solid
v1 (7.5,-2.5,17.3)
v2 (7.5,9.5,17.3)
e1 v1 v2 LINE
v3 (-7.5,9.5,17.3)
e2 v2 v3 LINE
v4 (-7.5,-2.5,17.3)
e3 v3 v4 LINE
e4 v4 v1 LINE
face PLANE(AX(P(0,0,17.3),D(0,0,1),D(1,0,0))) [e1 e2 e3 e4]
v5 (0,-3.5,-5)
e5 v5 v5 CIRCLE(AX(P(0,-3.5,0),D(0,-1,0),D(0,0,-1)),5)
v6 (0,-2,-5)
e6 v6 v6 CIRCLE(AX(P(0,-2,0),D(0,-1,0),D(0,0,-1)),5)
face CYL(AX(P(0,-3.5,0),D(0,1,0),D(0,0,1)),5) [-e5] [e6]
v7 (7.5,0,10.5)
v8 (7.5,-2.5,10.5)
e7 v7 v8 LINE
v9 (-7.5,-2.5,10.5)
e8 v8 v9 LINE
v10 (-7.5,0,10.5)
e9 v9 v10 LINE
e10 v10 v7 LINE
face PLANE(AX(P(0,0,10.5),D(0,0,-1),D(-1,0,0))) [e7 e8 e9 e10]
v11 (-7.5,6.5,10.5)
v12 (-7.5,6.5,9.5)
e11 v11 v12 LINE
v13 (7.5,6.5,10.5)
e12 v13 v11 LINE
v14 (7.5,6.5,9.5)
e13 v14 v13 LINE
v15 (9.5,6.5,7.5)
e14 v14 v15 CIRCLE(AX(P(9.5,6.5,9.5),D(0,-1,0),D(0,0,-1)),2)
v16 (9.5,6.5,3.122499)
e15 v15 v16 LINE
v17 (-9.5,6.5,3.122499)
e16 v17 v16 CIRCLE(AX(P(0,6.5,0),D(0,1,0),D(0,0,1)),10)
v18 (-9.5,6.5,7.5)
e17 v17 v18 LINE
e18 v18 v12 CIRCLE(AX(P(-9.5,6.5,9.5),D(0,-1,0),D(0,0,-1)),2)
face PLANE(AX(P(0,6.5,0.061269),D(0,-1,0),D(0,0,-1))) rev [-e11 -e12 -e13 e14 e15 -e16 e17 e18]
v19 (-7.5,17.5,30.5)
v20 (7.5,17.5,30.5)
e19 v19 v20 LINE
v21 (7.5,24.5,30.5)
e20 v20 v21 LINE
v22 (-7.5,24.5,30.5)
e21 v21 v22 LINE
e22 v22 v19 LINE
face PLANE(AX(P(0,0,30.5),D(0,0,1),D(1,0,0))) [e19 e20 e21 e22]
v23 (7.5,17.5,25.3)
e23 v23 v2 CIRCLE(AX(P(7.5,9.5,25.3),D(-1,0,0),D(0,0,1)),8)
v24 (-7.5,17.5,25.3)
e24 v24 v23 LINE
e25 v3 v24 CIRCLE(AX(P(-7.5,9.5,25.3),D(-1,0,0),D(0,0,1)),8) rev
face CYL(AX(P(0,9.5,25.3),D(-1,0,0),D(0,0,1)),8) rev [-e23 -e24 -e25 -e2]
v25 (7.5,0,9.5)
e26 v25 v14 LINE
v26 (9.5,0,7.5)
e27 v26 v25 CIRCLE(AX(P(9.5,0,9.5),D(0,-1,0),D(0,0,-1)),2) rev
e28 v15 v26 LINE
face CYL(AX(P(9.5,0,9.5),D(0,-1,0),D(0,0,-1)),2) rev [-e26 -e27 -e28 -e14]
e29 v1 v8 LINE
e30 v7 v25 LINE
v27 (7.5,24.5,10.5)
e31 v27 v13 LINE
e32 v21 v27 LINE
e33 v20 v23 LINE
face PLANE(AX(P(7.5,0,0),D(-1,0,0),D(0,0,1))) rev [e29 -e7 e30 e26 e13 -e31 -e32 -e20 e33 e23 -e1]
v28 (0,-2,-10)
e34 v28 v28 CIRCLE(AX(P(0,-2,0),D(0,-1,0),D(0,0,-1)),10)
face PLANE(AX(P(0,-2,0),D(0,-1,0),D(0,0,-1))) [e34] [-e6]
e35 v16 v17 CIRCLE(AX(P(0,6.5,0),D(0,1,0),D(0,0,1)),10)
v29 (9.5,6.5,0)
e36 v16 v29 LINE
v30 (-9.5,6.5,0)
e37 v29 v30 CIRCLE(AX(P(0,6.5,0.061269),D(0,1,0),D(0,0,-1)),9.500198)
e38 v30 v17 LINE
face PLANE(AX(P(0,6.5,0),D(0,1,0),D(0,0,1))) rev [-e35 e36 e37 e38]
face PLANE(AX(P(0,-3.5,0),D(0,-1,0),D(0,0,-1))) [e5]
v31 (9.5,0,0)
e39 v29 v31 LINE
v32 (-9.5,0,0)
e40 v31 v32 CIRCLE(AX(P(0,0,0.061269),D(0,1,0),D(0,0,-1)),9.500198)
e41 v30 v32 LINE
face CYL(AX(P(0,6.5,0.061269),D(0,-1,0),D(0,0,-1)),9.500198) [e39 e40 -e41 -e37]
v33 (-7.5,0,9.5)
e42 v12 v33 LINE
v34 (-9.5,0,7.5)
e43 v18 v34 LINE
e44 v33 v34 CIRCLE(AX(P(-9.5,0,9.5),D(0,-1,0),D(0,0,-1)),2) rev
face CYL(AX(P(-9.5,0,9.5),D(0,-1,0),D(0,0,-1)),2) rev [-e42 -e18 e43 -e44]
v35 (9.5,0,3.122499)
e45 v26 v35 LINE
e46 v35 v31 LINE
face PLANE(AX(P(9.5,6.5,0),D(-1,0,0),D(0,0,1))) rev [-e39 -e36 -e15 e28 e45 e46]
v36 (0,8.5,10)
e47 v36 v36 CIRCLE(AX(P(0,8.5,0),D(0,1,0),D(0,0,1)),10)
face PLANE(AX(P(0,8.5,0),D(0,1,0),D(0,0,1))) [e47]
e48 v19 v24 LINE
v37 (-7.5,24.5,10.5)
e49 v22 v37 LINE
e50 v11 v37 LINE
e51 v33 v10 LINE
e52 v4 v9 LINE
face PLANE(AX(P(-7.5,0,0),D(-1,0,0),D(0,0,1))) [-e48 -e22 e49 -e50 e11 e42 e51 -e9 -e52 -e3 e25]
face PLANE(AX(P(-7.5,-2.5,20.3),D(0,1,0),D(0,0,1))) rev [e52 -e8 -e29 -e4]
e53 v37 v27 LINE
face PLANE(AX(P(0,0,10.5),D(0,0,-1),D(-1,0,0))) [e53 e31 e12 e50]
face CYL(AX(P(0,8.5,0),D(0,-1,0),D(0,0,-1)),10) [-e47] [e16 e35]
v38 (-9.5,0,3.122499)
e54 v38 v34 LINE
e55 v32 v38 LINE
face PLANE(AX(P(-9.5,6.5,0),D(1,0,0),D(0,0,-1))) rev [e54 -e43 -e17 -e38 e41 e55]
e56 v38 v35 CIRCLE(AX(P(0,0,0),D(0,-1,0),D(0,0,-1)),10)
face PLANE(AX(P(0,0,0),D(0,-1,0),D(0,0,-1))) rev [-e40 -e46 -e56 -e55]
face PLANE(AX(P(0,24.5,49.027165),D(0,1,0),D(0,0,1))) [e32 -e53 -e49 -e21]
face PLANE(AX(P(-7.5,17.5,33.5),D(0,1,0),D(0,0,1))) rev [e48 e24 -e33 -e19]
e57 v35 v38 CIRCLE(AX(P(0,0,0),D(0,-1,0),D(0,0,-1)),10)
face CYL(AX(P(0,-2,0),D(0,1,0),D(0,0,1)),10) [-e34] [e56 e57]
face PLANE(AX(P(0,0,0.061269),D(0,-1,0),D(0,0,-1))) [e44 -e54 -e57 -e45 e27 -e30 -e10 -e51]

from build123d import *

# Parameters (mm, degrees)
EXTRUDE_2_DEPTH     = 6.5
SKETCH_3_R          = 10
EXTRUDE_3_DEPTH     = 2
EXTRUDE_START       = 2
SKETCH_4_R          = 10
EXTRUDE_4_DEPTH     = 2
SKETCH_5_R          = 5
EXTRUDE_5_DEPTH     = 1.5
SKETCH_8_W          = 6
SKETCH_8_H          = 6.5
CUT_EXTRUDE_2_DEPTH = 0.94
SKETCH_9_W          = 6
SKETCH_9_H          = 6.5
CUT_EXTRUDE_3_DEPTH = 0.94
FILLET_4_R          = 2
SKETCH_10_W         = 15
SKETCH_10_H         = 2.5
EXTRUDE_6_DEPTH     = 6.8
SKETCH_11_W         = 15
SKETCH_11_H         = 18
SKETCH_11_H_2       = 6.5
EXTRUDE_7_DEPTH     = 6.8
SKETCH_12_W         = 15
SKETCH_12_H         = 7
EXTRUDE_8_DEPTH     = 13.2
SKETCH_16_W         = 15
SKETCH_16_H         = 18
SKETCH_16_H_2       = 2.5
EXTRUDE_10_DEPTH    = 3
SKETCH_17_W         = 15
SKETCH_17_H         = 20
CUT_EXTRUDE_6_DEPTH = 3
SKETCH_18_W         = 15
SKETCH_18_H         = 7
CUT_EXTRUDE_7_DEPTH = 3
FILLET_7_R          = 8


with BuildPart() as part:
    # ｽｹｯﾁ1 → ﾎﾞｽ - 押し出し2 (new body)
    with BuildSketch(Plane(origin=(0, 0, 0), x_dir=(1, 0, 0), z_dir=(0, 1, 0))):
        with BuildLine():
            Line((-9.5, 0), (-9.5, -7.5))
            Line((-9.5, -7.5), (-8.44, -7.5))
            Line((-8.44, -7.5), (-8.44, -13.5))
            Line((-8.44, -13.5), (8.44, -13.5))
            Line((8.44, -13.5), (8.44, -7.5))
            Line((8.44, -7.5), (9.5, -7.5))
            Line((9.5, -7.5), (9.5, 0))
            ThreePointArc((9.5, 0), (0, 9.438928409), (-9.5, 0))
        make_face()
    extrude(amount=EXTRUDE_2_DEPTH)

    # ｽｹｯﾁ3 → ﾎﾞｽ - 押し出し3 (add)
    with BuildSketch(Plane(origin=(0, 6.5, 0), x_dir=(1, 0, 0), z_dir=(0, 1, 0))):
        with Locations(Location((0, 0, 0), (0, 0, 198.194872339))):
            Circle(SKETCH_3_R)
    extrude(amount=EXTRUDE_3_DEPTH)

    # ｽｹｯﾁ4 → ﾎﾞｽ - 押し出し4 (add)
    with BuildSketch(Plane.XZ.offset(EXTRUDE_START)):
        with Locations(Location((0, 0, 0), (0, 0, 161.805127661))):
            Circle(SKETCH_4_R)
    extrude(amount=-EXTRUDE_4_DEPTH)

    # ｽｹｯﾁ5 → ﾎﾞｽ - 押し出し5 (add)
    with BuildSketch(Plane.XZ.offset(2)):
        with Locations(Location((0, 0, 0), (0, 0, 270))):
            Circle(SKETCH_5_R)
    extrude(amount=EXTRUDE_5_DEPTH)

    # ｽｹｯﾁ8 → ｶｯﾄ - 押し出し2 (cut)
    with BuildSketch(Plane(origin=(8.44, 0, 0), x_dir=(0, 0, -1), z_dir=(1, 0, 0))):
        with Locations((-10.5, 3.25)):
            Rectangle(SKETCH_8_W, SKETCH_8_H)
    extrude(amount=-CUT_EXTRUDE_2_DEPTH, mode=Mode.SUBTRACT)

    # ｽｹｯﾁ9 → ｶｯﾄ - 押し出し3 (cut)
    with BuildSketch(Plane.ZY.offset(8.44)):
        with Locations((10.5, 3.25)):
            Rectangle(SKETCH_9_W, SKETCH_9_H)
    extrude(amount=-CUT_EXTRUDE_3_DEPTH, mode=Mode.SUBTRACT)

    # ﾌｨﾚｯﾄ4
    fillet_4_edges = [part.edges().sort_by_distance(p)[0] for p in [
        (7.5, 3.25, 7.5),
        (-7.5, 3.25, 7.5),
    ]]
    fillet(fillet_4_edges, radius=FILLET_4_R - 0.0001)  # a hair under: the kernel refuses the full size



with BuildPart() as body_2:
    # ｽｹｯﾁ10 → ﾎﾞｽ - 押し出し6 (new body)
    with BuildSketch(Plane.XY.offset(13.5)):
        with Locations((0, -1.25)):
            Rectangle(SKETCH_10_W, SKETCH_10_H)
    extrude(amount=EXTRUDE_6_DEPTH)


with BuildPart() as part_1:
    add(part.part)

    add(body_2.part)  # ﾎﾞｽ - 押し出し7 merges body 2
    # ｽｹｯﾁ11 → ﾎﾞｽ - 押し出し7 (add)
    with BuildSketch(Plane.XY.offset(13.5)):
        with Locations((0, 15.5)):
            Rectangle(SKETCH_11_W, SKETCH_11_H)
        with Locations((0, 3.25)):
            Rectangle(SKETCH_11_W, SKETCH_11_H_2)
    extrude(amount=EXTRUDE_7_DEPTH)

    # ｽｹｯﾁ12 → ﾎﾞｽ - 押し出し8 (add)
    with BuildSketch(Plane.XY.offset(20.3)):
        with Locations((0, 21)):
            Rectangle(SKETCH_12_W, SKETCH_12_H)
    extrude(amount=EXTRUDE_8_DEPTH)

    # ｽｹｯﾁ16 → ﾎﾞｽ - 押し出し10 (add)
    with BuildSketch(Plane(origin=(0, 0, 13.5), x_dir=(-1, 0, 0), z_dir=(0, 0, -1))):
        with Locations((0, 15.5)):
            Rectangle(SKETCH_16_W, SKETCH_16_H)
        with Locations((0, -1.25)):
            Rectangle(SKETCH_16_W, SKETCH_16_H_2)
    extrude(amount=EXTRUDE_10_DEPTH)

    # ｽｹｯﾁ17 → ｶｯﾄ - 押し出し6 (cut)
    with BuildSketch(Plane.XY.offset(20.3)):
        with Locations((0, 7.5)):
            Rectangle(SKETCH_17_W, SKETCH_17_H)
    extrude(amount=-CUT_EXTRUDE_6_DEPTH, mode=Mode.SUBTRACT)

    # ｽｹｯﾁ18 → ｶｯﾄ - 押し出し7 (cut)
    with BuildSketch(Plane.XY.offset(33.5)):
        with Locations((0, 21)):
            Rectangle(SKETCH_18_W, SKETCH_18_H)
    extrude(amount=-CUT_EXTRUDE_7_DEPTH, mode=Mode.SUBTRACT)

    # ﾌｨﾚｯﾄ7
    fillet_7_edges = [part_1.edges().sort_by_distance(p)[0] for p in [
        (0, 17.5, 17.3),
    ]]
    fillet(fillet_7_edges, radius=FILLET_7_R)


solid = part_1.part
